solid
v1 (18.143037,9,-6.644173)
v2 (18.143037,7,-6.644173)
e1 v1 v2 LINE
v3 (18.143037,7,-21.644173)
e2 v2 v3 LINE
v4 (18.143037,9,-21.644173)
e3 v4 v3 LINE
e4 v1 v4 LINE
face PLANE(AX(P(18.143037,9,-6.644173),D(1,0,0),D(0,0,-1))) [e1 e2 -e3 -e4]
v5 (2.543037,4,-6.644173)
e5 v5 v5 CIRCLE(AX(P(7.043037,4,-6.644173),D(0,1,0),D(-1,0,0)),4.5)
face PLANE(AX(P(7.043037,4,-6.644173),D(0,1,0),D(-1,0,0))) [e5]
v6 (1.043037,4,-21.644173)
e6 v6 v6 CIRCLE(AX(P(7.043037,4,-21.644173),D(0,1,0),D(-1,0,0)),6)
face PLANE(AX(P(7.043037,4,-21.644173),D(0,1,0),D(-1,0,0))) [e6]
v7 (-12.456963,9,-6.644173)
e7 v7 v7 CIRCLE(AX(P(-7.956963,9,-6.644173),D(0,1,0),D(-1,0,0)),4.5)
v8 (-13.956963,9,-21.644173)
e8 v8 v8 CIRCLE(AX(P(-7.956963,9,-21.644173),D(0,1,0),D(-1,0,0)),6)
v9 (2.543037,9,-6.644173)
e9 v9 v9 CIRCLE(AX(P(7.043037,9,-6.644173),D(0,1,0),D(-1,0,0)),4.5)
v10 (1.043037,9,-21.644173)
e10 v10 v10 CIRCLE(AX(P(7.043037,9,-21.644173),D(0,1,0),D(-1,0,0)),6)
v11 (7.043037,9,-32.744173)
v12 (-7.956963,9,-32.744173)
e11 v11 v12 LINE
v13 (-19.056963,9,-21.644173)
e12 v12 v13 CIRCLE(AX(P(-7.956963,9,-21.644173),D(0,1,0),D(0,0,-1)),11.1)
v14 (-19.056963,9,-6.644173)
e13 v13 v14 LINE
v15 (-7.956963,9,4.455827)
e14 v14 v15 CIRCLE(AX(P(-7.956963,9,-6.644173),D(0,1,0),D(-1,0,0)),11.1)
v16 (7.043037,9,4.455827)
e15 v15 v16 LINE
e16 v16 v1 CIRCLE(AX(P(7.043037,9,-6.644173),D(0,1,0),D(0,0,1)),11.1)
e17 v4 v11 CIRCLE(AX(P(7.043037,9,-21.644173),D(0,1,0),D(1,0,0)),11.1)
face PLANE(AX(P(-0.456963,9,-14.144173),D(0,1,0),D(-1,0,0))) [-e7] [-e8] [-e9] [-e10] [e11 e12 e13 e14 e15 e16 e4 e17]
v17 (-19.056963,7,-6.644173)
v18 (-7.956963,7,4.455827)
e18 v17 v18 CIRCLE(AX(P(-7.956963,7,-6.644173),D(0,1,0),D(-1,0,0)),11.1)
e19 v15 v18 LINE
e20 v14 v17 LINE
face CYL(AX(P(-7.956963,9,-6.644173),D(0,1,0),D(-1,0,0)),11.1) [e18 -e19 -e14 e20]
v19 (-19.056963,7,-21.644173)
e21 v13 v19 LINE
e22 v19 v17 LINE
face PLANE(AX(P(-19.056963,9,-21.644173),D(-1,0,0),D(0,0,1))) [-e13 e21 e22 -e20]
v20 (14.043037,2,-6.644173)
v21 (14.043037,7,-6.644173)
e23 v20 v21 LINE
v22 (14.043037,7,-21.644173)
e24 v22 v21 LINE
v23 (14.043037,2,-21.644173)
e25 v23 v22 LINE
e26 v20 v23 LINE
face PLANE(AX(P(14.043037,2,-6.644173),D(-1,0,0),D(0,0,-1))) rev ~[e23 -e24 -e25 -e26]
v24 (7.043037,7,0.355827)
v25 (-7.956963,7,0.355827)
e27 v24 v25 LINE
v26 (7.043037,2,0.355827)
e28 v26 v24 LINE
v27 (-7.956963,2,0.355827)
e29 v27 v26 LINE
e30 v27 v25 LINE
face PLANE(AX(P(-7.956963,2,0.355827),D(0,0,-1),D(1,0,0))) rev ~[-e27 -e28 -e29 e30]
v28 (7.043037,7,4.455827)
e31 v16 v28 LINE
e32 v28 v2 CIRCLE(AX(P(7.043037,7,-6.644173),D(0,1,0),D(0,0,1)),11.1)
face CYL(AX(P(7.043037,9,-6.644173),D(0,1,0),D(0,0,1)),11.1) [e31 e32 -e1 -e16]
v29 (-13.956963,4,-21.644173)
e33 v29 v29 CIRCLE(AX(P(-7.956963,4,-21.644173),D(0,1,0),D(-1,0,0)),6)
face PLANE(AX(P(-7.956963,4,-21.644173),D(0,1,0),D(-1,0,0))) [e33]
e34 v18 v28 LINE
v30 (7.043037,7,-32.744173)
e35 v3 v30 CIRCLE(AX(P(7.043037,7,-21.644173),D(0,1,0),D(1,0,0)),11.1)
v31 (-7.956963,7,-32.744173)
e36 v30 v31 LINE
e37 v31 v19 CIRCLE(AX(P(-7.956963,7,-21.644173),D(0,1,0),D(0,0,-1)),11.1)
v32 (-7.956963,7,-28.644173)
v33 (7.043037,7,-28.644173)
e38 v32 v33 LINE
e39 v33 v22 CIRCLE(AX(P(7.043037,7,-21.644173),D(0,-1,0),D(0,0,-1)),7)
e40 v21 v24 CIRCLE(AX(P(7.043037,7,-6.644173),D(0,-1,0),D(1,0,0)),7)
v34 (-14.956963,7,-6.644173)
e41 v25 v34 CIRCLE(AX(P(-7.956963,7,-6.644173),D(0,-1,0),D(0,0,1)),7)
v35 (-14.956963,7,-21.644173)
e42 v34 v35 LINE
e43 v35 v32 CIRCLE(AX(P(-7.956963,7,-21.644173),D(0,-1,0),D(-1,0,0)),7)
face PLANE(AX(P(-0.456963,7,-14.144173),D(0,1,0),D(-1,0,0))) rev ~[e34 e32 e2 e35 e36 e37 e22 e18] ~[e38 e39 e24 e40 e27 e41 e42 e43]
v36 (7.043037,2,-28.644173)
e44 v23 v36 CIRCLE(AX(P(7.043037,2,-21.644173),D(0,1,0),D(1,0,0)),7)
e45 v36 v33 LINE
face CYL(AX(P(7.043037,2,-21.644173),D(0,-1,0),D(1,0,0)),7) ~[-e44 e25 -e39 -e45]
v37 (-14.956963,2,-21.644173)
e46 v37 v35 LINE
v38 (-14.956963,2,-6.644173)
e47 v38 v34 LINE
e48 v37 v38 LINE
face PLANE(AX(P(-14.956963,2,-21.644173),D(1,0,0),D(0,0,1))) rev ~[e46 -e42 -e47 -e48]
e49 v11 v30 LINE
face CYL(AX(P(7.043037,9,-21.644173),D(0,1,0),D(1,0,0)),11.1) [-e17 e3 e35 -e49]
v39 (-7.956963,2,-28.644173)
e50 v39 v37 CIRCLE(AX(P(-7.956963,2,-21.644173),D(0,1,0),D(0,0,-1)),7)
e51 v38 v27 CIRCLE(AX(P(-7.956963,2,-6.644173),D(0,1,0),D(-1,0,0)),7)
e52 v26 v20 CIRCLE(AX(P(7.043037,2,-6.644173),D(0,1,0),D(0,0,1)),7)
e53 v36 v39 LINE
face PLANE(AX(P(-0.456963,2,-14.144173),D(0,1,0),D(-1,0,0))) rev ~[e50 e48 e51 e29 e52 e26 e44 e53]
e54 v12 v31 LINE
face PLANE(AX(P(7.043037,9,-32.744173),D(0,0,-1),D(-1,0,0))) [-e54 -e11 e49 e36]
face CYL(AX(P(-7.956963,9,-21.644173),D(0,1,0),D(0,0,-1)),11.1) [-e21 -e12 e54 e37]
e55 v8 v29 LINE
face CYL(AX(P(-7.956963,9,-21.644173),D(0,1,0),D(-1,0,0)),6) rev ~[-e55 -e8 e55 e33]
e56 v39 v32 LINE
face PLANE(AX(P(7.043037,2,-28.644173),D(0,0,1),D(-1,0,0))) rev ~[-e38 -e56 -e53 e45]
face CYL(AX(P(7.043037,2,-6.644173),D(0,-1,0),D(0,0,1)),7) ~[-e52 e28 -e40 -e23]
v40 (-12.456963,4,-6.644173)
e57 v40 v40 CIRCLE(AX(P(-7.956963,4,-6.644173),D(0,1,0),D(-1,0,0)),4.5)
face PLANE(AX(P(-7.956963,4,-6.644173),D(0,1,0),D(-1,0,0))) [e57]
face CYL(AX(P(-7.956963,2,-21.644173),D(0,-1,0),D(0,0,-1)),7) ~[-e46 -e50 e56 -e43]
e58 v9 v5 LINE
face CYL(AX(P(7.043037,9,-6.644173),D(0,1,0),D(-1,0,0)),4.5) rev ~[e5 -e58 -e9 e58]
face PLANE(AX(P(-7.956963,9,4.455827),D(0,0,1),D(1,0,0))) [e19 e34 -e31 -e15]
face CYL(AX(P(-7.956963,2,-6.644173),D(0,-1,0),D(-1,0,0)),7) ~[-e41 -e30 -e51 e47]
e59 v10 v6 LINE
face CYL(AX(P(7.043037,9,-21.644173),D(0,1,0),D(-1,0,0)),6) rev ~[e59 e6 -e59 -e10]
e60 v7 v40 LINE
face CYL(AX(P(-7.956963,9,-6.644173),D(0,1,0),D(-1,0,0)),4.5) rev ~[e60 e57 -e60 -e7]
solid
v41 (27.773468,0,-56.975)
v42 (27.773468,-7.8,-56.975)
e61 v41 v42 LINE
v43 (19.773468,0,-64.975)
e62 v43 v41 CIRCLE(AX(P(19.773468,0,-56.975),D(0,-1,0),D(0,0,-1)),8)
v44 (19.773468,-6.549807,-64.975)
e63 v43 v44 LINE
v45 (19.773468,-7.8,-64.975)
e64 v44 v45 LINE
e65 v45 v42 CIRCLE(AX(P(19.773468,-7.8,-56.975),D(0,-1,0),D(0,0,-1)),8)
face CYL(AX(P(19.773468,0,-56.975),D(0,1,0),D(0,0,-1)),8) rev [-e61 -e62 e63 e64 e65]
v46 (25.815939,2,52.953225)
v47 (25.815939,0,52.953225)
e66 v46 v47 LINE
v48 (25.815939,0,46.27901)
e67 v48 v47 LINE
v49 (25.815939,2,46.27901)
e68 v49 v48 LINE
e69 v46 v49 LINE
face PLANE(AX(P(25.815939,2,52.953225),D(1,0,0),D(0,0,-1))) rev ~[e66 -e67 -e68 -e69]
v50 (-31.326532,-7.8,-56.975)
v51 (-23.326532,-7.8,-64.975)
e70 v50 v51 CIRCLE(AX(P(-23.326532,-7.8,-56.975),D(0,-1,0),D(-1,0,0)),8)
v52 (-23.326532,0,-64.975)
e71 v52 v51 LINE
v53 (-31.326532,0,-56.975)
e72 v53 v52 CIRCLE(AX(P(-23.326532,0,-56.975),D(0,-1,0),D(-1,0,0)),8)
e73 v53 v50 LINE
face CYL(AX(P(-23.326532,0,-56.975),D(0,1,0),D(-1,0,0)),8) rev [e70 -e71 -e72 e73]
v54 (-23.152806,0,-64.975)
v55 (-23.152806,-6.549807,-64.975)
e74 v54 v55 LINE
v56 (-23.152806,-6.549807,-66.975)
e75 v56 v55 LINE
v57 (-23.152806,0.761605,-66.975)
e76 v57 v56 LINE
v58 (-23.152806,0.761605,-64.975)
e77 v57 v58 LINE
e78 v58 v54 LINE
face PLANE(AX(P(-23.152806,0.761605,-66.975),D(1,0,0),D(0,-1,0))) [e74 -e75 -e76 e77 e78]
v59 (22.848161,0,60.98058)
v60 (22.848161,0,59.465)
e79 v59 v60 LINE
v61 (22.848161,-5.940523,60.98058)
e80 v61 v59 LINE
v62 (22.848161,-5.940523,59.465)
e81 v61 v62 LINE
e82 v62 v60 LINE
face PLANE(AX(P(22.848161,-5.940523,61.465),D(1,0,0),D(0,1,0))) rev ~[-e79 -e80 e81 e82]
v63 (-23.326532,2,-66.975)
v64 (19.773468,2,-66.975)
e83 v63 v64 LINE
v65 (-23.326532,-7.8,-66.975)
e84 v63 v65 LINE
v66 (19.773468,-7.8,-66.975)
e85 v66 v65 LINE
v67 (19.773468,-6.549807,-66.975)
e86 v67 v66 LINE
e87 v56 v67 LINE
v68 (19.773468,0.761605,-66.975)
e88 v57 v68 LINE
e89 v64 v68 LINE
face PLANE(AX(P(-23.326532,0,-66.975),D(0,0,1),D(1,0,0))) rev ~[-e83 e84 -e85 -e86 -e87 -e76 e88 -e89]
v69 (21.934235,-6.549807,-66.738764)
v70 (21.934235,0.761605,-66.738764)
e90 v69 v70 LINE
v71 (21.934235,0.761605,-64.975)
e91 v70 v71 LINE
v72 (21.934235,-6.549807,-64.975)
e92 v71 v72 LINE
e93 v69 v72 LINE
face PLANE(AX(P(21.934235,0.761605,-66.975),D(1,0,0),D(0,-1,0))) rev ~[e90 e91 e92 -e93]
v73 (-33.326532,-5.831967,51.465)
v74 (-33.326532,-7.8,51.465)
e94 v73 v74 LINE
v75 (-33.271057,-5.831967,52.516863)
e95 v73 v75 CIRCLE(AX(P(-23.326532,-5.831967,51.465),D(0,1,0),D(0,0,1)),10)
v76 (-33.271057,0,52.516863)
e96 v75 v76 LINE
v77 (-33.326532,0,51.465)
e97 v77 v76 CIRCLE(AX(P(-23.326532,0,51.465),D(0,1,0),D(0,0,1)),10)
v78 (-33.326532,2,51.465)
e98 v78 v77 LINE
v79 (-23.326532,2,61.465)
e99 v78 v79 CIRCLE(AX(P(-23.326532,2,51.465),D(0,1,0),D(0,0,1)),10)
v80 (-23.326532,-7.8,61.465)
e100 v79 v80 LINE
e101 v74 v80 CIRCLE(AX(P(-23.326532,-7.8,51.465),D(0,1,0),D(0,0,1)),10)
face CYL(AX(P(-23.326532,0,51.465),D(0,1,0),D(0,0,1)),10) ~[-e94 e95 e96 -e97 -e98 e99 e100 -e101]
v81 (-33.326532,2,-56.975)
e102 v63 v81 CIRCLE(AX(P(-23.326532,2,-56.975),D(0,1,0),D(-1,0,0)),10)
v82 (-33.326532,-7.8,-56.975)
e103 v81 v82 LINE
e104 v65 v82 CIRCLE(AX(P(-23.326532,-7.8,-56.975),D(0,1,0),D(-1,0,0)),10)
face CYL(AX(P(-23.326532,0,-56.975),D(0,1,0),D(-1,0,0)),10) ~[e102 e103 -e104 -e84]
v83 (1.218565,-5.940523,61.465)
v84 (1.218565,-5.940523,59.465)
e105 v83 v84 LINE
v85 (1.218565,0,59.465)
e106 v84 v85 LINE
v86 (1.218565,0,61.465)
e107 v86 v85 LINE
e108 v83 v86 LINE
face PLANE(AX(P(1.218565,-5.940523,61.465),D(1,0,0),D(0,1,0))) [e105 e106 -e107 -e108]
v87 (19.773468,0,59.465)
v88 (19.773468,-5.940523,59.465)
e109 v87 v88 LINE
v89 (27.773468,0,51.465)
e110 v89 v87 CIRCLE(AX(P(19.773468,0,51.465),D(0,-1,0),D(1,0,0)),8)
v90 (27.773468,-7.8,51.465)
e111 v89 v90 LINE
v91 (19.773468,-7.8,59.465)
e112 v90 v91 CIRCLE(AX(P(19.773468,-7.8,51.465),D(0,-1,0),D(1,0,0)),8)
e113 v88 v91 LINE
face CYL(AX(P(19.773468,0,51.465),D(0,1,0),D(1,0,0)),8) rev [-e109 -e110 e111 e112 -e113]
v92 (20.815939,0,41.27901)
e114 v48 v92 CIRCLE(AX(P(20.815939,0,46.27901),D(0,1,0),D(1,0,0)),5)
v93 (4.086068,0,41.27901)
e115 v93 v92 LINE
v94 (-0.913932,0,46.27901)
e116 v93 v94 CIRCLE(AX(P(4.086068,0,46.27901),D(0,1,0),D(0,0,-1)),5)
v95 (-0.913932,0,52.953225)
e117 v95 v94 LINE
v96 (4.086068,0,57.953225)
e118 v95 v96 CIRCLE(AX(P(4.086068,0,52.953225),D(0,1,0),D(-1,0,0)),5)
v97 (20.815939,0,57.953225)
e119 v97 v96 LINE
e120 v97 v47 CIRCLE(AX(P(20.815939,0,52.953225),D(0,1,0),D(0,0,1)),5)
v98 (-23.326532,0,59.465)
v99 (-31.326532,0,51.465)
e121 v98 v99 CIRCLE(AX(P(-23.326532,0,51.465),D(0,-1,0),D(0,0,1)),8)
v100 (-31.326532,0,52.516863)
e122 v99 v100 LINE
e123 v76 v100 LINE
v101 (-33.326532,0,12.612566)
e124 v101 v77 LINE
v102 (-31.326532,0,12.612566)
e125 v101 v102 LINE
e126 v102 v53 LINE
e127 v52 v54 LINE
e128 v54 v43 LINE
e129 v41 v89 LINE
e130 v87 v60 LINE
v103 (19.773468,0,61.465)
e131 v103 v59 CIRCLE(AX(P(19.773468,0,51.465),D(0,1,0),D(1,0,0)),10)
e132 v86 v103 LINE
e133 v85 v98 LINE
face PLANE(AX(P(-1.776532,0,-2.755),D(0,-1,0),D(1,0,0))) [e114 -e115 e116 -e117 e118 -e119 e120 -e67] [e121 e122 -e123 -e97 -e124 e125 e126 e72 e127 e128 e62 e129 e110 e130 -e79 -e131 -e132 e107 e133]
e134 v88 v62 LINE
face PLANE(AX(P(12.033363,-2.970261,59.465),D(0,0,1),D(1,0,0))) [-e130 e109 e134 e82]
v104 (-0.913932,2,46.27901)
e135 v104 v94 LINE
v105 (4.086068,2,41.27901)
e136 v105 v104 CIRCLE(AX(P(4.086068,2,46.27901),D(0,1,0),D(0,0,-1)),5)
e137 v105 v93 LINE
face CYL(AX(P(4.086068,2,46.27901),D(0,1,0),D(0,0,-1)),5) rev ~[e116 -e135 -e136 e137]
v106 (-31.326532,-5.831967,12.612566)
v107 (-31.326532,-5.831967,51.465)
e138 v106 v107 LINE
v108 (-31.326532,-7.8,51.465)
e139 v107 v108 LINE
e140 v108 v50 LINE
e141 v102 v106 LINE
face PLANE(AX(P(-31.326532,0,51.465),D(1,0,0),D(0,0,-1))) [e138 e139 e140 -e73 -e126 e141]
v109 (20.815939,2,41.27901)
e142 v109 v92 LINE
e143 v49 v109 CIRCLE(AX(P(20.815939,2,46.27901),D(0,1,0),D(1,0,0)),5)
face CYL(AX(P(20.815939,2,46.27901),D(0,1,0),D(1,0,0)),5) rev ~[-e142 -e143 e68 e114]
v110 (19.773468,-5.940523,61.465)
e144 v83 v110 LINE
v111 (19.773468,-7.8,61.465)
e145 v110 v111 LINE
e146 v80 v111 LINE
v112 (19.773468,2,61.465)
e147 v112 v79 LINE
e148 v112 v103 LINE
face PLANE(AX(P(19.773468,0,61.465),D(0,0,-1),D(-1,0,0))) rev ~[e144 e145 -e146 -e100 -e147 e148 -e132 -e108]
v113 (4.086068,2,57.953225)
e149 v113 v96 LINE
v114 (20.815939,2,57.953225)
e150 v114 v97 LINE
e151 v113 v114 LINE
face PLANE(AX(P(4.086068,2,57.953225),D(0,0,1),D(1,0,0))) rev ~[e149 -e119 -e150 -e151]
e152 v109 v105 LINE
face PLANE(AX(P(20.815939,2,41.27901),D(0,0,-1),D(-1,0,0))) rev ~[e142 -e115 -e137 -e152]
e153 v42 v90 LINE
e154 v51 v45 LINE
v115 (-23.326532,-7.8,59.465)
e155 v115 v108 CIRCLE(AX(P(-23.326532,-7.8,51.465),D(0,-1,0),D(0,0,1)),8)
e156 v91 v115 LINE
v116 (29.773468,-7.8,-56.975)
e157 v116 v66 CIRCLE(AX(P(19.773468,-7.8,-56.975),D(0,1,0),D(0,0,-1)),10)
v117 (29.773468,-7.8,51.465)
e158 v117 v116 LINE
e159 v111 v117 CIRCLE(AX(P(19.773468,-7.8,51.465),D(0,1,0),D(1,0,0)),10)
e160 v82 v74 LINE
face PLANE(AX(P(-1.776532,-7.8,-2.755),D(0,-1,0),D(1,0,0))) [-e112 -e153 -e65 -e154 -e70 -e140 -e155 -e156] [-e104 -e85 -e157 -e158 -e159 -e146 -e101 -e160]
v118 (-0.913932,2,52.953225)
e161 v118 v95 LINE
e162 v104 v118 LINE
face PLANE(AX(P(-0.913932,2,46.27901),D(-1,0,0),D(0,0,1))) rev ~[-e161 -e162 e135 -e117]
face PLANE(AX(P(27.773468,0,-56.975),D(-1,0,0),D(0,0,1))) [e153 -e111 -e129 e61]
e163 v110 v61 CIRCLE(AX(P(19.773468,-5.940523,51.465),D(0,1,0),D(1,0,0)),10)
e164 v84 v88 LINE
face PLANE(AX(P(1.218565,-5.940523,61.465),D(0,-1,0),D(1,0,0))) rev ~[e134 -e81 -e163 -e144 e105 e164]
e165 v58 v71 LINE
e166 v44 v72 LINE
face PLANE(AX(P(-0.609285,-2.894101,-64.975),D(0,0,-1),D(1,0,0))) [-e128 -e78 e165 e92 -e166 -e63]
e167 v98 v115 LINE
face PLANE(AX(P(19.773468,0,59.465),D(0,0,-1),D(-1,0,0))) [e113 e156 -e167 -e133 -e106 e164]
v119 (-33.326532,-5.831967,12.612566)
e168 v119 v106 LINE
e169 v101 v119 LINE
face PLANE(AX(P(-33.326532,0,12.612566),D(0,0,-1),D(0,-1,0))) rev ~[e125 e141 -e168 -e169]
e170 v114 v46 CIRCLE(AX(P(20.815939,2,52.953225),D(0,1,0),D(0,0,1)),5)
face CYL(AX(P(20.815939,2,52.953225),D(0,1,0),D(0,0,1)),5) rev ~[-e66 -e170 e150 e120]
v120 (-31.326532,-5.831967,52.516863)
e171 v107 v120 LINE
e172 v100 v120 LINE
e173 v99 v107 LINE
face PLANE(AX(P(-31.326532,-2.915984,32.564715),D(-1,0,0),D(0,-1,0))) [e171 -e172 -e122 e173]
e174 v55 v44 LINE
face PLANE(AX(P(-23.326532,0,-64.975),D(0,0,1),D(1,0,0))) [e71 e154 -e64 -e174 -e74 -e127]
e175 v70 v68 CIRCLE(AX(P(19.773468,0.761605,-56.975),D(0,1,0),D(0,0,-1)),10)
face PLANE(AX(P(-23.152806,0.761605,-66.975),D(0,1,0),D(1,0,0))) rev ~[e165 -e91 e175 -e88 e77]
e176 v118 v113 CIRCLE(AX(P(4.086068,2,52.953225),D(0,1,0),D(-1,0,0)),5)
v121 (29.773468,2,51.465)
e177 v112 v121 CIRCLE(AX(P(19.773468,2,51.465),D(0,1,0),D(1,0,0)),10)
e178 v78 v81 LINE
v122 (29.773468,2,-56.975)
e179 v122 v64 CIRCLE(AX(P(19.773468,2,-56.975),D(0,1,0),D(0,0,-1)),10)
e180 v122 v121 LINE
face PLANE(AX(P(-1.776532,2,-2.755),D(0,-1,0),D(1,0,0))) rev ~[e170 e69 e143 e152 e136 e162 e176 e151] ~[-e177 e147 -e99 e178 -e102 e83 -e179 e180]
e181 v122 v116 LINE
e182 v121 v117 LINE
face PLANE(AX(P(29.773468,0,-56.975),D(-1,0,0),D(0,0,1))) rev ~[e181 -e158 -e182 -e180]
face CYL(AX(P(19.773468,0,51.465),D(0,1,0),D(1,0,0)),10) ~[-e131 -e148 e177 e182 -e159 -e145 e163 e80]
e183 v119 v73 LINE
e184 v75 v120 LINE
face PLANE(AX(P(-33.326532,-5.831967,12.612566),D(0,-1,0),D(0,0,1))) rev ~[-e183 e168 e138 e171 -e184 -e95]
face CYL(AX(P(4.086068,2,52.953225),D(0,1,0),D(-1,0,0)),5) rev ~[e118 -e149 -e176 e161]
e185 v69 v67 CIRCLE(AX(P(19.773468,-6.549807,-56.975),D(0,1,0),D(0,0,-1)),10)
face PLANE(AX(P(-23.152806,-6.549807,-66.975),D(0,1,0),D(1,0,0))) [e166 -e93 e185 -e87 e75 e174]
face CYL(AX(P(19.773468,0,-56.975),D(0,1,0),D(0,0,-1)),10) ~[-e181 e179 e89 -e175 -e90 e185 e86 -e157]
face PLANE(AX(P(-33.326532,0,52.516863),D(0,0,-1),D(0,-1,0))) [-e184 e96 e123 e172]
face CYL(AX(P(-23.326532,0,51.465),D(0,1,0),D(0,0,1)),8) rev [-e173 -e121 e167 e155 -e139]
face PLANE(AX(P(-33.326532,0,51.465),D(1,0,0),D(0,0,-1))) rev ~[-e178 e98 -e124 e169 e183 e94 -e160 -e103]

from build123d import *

# Parameters (mm, degrees)
F1_DEPTH  = 7.8
F2_T      = 2
F4_DEPTH  = 9.801
F5_W      = 45.0870413333
F5_H      = 7.3114127154
F6_DEPTH  = 2
F7_W      = 5.831967108
F7_H      = 39.9042963982
F8_DEPTH  = 2
F9_W      = 21.6295962455
F9_H      = 5.9405225329
F10_DEPTH = 2
F13_DEPTH = 7
F16_DEPTH = 2
F14_R     = 4.5
F14_R_2   = 6
F17_DEPTH = 155
F18_DEPTH = 5


# Not quite as in the source:
# - an extrude ends at something that could not be found from the text; its depth is read off the source's solid


with BuildPart() as f1:
    # F0 (on Front) → F1 (new body)
    with BuildSketch(Plane.XZ):
        with BuildLine():
            Line((-23.3265317287, -64.975), (19.7734682713, -64.975))
            ThreePointArc((19.7734682713, -64.975), (25.4303225208, -62.6318542495), (27.7734682713, -56.975))
            Line((27.7734682713, -56.975), (27.7734682713, 51.465))
            ThreePointArc((27.7734682713, 51.465), (25.4303225208, 57.1218542495), (19.7734682713, 59.465))
            Line((19.7734682713, 59.465), (-23.3265317287, 59.465))
            ThreePointArc((-23.3265317287, 59.465), (-28.9833859782, 57.1218542495), (-31.3265317287, 51.465))
            Line((-31.3265317287, 51.465), (-31.3265317287, -56.975))
            ThreePointArc((-31.3265317287, -56.975), (-28.9833859782, -62.6318542495), (-23.3265317287, -64.975))
        make_face()
    extrude(amount=F1_DEPTH)

    # F2
    f2_openings = [f1.faces().sort_by_distance(p)[0] for p in [
        (-1.776532, -7.8, -2.755),
    ]]
    offset(amount=F2_T, openings=f2_openings, kind=Kind.INTERSECTION)

    # F3 (on face) → F4 (cut, through all)
    with BuildSketch(Plane(origin=(0, 2, 0), x_dir=(-1, 0, 0), z_dir=(0, 1, 0))):
        with BuildLine():
            Line((-4.0860684775, 57.9532251436), (-20.8159385248, 57.9532251436))
            ThreePointArc((-20.8159385248, 57.9532251436), (-24.3514724307, 56.4887590495), (-25.8159385248, 52.9532251436))
            Line((-25.8159385248, 52.9532251436), (-25.8159385248, 46.2790104747))
            ThreePointArc((-25.8159385248, 46.2790104747), (-24.3514724307, 42.7434765687), (-20.8159385248, 41.2790104747))
            Line((-20.8159385248, 41.2790104747), (-4.0860684775, 41.2790104747))
            ThreePointArc((-4.0860684775, 41.2790104747), (-0.5505345715, 42.7434765687), (0.9139315225, 46.2790104747))
            Line((0.9139315225, 46.2790104747), (0.9139315225, 52.9532251436))
            ThreePointArc((0.9139315225, 52.9532251436), (-0.5505345715, 56.4887590495), (-4.0860684775, 57.9532251436))
        make_face()
    extrude(amount=-F4_DEPTH, mode=Mode.SUBTRACT)

    # F5 (on face) → F6 (cut)
    with BuildSketch(Plane(origin=(0, 0, -66.975), x_dir=(1, 0, 0), z_dir=(0, 0, -1))):
        with Locations((-0.6092851982, 2.8941009077)):
            Rectangle(F5_W, F5_H)
    extrude(amount=-F6_DEPTH, mode=Mode.SUBTRACT)

    # F7 (on face) → F8 (cut)
    with BuildSketch(Plane(origin=(-33.3265317287, 0, 0), x_dir=(0, -1, 0), z_dir=(-1, 0, 0))):
        with Locations((2.915983554, 32.564714551)):
            Rectangle(F7_W, F7_H)
    extrude(amount=-F8_DEPTH, mode=Mode.SUBTRACT)

    # F9 (on face) → F10 (cut)
    with BuildSketch(Plane.XY.offset(61.465)):
        with Locations((12.0333628147, -2.9702612665)):
            Rectangle(F9_W, F9_H)
    extrude(amount=-F10_DEPTH, mode=Mode.SUBTRACT)

    # F14 (on face) → F17 (cut, through all)
    with BuildSketch(Plane(origin=(0, 9, 0), x_dir=(-1, 0, 0), z_dir=(0, 1, 0))):
        with Locations((-7.0430367999, -6.644173318)):
            Circle(F14_R)
        with Locations((7.9569632001, -6.644173318)):
            Circle(F14_R)
        with Locations((-7.0430367999, -21.644173318)):
            Circle(F14_R_2)
        with Locations((7.9569632001, -21.644173318)):
            Circle(F14_R_2)
    extrude(amount=F17_DEPTH, mode=Mode.SUBTRACT)


with BuildPart() as f13:
    # F12 (on face) → F13 (new body)
    with BuildSketch(Plane(origin=(0, 2, 0), x_dir=(-1, 0, 0), z_dir=(0, 1, 0))):
        with BuildLine():
            ThreePointArc((-14.0430367999, -21.644173318), (-11.9927842682, -26.5939207863), (-7.0430367999, -28.644173318))
            Line((-7.0430367999, -28.644173318), (7.9569632001, -28.644173318))
            ThreePointArc((7.9569632001, -28.644173318), (12.9067106684, -26.5939207863), (14.9569632001, -21.644173318))
            Line((14.9569632001, -21.644173318), (14.9569632001, -6.644173318))
            ThreePointArc((14.9569632001, -6.644173318), (12.9067106684, -1.6944258497), (7.9569632001, 0.355826682))
            Line((7.9569632001, 0.355826682), (-7.0430367999, 0.355826682))
            ThreePointArc((-7.0430367999, 0.355826682), (-11.9927842682, -1.6944258497), (-14.0430367999, -6.644173318))
            Line((-14.0430367999, -6.644173318), (-14.0430367999, -21.644173318))
        make_face()
    extrude(amount=F13_DEPTH)

    # F15 (on face) → F16 (join)
    with BuildSketch(Plane(origin=(0, 9, 0), x_dir=(-1, 0, 0), z_dir=(0, 1, 0))):
        with BuildLine():
            Line((7.9569632001, 4.4558267109), (-7.0430367999, 4.4558267109))
            ThreePointArc((-7.0430367999, 4.4558267109), (-14.8919220915, 1.2047119736), (-18.1430368288, -6.644173318))
            Line((-18.1430368288, -6.644173318), (-18.1430368288, -21.644173318))
            ThreePointArc((-18.1430368288, -21.644173318), (-14.8919220915, -29.4930586096), (-7.0430367999, -32.7441733469))
            Line((-7.0430367999, -32.7441733469), (7.9569632001, -32.7441733469))
            ThreePointArc((7.9569632001, -32.7441733469), (15.8058484917, -29.4930586096), (19.056963229, -21.644173318))
            Line((19.056963229, -21.644173318), (19.056963229, -6.644173318))
            ThreePointArc((19.056963229, -6.644173318), (15.8058484917, 1.2047119736), (7.9569632001, 4.4558267109))
        make_face()
        with BuildLine():
            Line((-14.0430367999, -21.644173318), (-14.0430367999, -6.644173318))
            ThreePointArc((-14.0430367999, -6.644173318), (-11.9927842682, -1.6944258497), (-7.0430367999, 0.355826682))
            Line((-7.0430367999, 0.355826682), (7.9569632001, 0.355826682))
            ThreePointArc((7.9569632001, 0.355826682), (12.9067106684, -1.6944258497), (14.9569632001, -6.644173318))
            Line((14.9569632001, -6.644173318), (14.9569632001, -21.644173318))
            ThreePointArc((14.9569632001, -21.644173318), (12.9067106684, -26.5939207863), (7.9569632001, -28.644173318))
            Line((7.9569632001, -28.644173318), (-7.0430367999, -28.644173318))
            ThreePointArc((-7.0430367999, -28.644173318), (-11.9927842682, -26.5939207863), (-14.0430367999, -21.644173318))
        make_face(mode=Mode.SUBTRACT)
    extrude(amount=-F16_DEPTH)

    # F14 (on face) → F18 (cut)
    with BuildSketch(Plane(origin=(0, 9, 0), x_dir=(-1, 0, 0), z_dir=(0, 1, 0))):
        with Locations((7.9569632001, -6.644173318)):
            Circle(F14_R)
        with Locations((-7.0430367999, -6.644173318)):
            Circle(F14_R)
        with Locations((-7.0430367999, -21.644173318)):
            Circle(F14_R_2)
        with Locations((7.9569632001, -21.644173318)):
            Circle(F14_R_2)
    extrude(amount=-F18_DEPTH, mode=Mode.SUBTRACT)


solid = Compound([f1.part, f13.part])
